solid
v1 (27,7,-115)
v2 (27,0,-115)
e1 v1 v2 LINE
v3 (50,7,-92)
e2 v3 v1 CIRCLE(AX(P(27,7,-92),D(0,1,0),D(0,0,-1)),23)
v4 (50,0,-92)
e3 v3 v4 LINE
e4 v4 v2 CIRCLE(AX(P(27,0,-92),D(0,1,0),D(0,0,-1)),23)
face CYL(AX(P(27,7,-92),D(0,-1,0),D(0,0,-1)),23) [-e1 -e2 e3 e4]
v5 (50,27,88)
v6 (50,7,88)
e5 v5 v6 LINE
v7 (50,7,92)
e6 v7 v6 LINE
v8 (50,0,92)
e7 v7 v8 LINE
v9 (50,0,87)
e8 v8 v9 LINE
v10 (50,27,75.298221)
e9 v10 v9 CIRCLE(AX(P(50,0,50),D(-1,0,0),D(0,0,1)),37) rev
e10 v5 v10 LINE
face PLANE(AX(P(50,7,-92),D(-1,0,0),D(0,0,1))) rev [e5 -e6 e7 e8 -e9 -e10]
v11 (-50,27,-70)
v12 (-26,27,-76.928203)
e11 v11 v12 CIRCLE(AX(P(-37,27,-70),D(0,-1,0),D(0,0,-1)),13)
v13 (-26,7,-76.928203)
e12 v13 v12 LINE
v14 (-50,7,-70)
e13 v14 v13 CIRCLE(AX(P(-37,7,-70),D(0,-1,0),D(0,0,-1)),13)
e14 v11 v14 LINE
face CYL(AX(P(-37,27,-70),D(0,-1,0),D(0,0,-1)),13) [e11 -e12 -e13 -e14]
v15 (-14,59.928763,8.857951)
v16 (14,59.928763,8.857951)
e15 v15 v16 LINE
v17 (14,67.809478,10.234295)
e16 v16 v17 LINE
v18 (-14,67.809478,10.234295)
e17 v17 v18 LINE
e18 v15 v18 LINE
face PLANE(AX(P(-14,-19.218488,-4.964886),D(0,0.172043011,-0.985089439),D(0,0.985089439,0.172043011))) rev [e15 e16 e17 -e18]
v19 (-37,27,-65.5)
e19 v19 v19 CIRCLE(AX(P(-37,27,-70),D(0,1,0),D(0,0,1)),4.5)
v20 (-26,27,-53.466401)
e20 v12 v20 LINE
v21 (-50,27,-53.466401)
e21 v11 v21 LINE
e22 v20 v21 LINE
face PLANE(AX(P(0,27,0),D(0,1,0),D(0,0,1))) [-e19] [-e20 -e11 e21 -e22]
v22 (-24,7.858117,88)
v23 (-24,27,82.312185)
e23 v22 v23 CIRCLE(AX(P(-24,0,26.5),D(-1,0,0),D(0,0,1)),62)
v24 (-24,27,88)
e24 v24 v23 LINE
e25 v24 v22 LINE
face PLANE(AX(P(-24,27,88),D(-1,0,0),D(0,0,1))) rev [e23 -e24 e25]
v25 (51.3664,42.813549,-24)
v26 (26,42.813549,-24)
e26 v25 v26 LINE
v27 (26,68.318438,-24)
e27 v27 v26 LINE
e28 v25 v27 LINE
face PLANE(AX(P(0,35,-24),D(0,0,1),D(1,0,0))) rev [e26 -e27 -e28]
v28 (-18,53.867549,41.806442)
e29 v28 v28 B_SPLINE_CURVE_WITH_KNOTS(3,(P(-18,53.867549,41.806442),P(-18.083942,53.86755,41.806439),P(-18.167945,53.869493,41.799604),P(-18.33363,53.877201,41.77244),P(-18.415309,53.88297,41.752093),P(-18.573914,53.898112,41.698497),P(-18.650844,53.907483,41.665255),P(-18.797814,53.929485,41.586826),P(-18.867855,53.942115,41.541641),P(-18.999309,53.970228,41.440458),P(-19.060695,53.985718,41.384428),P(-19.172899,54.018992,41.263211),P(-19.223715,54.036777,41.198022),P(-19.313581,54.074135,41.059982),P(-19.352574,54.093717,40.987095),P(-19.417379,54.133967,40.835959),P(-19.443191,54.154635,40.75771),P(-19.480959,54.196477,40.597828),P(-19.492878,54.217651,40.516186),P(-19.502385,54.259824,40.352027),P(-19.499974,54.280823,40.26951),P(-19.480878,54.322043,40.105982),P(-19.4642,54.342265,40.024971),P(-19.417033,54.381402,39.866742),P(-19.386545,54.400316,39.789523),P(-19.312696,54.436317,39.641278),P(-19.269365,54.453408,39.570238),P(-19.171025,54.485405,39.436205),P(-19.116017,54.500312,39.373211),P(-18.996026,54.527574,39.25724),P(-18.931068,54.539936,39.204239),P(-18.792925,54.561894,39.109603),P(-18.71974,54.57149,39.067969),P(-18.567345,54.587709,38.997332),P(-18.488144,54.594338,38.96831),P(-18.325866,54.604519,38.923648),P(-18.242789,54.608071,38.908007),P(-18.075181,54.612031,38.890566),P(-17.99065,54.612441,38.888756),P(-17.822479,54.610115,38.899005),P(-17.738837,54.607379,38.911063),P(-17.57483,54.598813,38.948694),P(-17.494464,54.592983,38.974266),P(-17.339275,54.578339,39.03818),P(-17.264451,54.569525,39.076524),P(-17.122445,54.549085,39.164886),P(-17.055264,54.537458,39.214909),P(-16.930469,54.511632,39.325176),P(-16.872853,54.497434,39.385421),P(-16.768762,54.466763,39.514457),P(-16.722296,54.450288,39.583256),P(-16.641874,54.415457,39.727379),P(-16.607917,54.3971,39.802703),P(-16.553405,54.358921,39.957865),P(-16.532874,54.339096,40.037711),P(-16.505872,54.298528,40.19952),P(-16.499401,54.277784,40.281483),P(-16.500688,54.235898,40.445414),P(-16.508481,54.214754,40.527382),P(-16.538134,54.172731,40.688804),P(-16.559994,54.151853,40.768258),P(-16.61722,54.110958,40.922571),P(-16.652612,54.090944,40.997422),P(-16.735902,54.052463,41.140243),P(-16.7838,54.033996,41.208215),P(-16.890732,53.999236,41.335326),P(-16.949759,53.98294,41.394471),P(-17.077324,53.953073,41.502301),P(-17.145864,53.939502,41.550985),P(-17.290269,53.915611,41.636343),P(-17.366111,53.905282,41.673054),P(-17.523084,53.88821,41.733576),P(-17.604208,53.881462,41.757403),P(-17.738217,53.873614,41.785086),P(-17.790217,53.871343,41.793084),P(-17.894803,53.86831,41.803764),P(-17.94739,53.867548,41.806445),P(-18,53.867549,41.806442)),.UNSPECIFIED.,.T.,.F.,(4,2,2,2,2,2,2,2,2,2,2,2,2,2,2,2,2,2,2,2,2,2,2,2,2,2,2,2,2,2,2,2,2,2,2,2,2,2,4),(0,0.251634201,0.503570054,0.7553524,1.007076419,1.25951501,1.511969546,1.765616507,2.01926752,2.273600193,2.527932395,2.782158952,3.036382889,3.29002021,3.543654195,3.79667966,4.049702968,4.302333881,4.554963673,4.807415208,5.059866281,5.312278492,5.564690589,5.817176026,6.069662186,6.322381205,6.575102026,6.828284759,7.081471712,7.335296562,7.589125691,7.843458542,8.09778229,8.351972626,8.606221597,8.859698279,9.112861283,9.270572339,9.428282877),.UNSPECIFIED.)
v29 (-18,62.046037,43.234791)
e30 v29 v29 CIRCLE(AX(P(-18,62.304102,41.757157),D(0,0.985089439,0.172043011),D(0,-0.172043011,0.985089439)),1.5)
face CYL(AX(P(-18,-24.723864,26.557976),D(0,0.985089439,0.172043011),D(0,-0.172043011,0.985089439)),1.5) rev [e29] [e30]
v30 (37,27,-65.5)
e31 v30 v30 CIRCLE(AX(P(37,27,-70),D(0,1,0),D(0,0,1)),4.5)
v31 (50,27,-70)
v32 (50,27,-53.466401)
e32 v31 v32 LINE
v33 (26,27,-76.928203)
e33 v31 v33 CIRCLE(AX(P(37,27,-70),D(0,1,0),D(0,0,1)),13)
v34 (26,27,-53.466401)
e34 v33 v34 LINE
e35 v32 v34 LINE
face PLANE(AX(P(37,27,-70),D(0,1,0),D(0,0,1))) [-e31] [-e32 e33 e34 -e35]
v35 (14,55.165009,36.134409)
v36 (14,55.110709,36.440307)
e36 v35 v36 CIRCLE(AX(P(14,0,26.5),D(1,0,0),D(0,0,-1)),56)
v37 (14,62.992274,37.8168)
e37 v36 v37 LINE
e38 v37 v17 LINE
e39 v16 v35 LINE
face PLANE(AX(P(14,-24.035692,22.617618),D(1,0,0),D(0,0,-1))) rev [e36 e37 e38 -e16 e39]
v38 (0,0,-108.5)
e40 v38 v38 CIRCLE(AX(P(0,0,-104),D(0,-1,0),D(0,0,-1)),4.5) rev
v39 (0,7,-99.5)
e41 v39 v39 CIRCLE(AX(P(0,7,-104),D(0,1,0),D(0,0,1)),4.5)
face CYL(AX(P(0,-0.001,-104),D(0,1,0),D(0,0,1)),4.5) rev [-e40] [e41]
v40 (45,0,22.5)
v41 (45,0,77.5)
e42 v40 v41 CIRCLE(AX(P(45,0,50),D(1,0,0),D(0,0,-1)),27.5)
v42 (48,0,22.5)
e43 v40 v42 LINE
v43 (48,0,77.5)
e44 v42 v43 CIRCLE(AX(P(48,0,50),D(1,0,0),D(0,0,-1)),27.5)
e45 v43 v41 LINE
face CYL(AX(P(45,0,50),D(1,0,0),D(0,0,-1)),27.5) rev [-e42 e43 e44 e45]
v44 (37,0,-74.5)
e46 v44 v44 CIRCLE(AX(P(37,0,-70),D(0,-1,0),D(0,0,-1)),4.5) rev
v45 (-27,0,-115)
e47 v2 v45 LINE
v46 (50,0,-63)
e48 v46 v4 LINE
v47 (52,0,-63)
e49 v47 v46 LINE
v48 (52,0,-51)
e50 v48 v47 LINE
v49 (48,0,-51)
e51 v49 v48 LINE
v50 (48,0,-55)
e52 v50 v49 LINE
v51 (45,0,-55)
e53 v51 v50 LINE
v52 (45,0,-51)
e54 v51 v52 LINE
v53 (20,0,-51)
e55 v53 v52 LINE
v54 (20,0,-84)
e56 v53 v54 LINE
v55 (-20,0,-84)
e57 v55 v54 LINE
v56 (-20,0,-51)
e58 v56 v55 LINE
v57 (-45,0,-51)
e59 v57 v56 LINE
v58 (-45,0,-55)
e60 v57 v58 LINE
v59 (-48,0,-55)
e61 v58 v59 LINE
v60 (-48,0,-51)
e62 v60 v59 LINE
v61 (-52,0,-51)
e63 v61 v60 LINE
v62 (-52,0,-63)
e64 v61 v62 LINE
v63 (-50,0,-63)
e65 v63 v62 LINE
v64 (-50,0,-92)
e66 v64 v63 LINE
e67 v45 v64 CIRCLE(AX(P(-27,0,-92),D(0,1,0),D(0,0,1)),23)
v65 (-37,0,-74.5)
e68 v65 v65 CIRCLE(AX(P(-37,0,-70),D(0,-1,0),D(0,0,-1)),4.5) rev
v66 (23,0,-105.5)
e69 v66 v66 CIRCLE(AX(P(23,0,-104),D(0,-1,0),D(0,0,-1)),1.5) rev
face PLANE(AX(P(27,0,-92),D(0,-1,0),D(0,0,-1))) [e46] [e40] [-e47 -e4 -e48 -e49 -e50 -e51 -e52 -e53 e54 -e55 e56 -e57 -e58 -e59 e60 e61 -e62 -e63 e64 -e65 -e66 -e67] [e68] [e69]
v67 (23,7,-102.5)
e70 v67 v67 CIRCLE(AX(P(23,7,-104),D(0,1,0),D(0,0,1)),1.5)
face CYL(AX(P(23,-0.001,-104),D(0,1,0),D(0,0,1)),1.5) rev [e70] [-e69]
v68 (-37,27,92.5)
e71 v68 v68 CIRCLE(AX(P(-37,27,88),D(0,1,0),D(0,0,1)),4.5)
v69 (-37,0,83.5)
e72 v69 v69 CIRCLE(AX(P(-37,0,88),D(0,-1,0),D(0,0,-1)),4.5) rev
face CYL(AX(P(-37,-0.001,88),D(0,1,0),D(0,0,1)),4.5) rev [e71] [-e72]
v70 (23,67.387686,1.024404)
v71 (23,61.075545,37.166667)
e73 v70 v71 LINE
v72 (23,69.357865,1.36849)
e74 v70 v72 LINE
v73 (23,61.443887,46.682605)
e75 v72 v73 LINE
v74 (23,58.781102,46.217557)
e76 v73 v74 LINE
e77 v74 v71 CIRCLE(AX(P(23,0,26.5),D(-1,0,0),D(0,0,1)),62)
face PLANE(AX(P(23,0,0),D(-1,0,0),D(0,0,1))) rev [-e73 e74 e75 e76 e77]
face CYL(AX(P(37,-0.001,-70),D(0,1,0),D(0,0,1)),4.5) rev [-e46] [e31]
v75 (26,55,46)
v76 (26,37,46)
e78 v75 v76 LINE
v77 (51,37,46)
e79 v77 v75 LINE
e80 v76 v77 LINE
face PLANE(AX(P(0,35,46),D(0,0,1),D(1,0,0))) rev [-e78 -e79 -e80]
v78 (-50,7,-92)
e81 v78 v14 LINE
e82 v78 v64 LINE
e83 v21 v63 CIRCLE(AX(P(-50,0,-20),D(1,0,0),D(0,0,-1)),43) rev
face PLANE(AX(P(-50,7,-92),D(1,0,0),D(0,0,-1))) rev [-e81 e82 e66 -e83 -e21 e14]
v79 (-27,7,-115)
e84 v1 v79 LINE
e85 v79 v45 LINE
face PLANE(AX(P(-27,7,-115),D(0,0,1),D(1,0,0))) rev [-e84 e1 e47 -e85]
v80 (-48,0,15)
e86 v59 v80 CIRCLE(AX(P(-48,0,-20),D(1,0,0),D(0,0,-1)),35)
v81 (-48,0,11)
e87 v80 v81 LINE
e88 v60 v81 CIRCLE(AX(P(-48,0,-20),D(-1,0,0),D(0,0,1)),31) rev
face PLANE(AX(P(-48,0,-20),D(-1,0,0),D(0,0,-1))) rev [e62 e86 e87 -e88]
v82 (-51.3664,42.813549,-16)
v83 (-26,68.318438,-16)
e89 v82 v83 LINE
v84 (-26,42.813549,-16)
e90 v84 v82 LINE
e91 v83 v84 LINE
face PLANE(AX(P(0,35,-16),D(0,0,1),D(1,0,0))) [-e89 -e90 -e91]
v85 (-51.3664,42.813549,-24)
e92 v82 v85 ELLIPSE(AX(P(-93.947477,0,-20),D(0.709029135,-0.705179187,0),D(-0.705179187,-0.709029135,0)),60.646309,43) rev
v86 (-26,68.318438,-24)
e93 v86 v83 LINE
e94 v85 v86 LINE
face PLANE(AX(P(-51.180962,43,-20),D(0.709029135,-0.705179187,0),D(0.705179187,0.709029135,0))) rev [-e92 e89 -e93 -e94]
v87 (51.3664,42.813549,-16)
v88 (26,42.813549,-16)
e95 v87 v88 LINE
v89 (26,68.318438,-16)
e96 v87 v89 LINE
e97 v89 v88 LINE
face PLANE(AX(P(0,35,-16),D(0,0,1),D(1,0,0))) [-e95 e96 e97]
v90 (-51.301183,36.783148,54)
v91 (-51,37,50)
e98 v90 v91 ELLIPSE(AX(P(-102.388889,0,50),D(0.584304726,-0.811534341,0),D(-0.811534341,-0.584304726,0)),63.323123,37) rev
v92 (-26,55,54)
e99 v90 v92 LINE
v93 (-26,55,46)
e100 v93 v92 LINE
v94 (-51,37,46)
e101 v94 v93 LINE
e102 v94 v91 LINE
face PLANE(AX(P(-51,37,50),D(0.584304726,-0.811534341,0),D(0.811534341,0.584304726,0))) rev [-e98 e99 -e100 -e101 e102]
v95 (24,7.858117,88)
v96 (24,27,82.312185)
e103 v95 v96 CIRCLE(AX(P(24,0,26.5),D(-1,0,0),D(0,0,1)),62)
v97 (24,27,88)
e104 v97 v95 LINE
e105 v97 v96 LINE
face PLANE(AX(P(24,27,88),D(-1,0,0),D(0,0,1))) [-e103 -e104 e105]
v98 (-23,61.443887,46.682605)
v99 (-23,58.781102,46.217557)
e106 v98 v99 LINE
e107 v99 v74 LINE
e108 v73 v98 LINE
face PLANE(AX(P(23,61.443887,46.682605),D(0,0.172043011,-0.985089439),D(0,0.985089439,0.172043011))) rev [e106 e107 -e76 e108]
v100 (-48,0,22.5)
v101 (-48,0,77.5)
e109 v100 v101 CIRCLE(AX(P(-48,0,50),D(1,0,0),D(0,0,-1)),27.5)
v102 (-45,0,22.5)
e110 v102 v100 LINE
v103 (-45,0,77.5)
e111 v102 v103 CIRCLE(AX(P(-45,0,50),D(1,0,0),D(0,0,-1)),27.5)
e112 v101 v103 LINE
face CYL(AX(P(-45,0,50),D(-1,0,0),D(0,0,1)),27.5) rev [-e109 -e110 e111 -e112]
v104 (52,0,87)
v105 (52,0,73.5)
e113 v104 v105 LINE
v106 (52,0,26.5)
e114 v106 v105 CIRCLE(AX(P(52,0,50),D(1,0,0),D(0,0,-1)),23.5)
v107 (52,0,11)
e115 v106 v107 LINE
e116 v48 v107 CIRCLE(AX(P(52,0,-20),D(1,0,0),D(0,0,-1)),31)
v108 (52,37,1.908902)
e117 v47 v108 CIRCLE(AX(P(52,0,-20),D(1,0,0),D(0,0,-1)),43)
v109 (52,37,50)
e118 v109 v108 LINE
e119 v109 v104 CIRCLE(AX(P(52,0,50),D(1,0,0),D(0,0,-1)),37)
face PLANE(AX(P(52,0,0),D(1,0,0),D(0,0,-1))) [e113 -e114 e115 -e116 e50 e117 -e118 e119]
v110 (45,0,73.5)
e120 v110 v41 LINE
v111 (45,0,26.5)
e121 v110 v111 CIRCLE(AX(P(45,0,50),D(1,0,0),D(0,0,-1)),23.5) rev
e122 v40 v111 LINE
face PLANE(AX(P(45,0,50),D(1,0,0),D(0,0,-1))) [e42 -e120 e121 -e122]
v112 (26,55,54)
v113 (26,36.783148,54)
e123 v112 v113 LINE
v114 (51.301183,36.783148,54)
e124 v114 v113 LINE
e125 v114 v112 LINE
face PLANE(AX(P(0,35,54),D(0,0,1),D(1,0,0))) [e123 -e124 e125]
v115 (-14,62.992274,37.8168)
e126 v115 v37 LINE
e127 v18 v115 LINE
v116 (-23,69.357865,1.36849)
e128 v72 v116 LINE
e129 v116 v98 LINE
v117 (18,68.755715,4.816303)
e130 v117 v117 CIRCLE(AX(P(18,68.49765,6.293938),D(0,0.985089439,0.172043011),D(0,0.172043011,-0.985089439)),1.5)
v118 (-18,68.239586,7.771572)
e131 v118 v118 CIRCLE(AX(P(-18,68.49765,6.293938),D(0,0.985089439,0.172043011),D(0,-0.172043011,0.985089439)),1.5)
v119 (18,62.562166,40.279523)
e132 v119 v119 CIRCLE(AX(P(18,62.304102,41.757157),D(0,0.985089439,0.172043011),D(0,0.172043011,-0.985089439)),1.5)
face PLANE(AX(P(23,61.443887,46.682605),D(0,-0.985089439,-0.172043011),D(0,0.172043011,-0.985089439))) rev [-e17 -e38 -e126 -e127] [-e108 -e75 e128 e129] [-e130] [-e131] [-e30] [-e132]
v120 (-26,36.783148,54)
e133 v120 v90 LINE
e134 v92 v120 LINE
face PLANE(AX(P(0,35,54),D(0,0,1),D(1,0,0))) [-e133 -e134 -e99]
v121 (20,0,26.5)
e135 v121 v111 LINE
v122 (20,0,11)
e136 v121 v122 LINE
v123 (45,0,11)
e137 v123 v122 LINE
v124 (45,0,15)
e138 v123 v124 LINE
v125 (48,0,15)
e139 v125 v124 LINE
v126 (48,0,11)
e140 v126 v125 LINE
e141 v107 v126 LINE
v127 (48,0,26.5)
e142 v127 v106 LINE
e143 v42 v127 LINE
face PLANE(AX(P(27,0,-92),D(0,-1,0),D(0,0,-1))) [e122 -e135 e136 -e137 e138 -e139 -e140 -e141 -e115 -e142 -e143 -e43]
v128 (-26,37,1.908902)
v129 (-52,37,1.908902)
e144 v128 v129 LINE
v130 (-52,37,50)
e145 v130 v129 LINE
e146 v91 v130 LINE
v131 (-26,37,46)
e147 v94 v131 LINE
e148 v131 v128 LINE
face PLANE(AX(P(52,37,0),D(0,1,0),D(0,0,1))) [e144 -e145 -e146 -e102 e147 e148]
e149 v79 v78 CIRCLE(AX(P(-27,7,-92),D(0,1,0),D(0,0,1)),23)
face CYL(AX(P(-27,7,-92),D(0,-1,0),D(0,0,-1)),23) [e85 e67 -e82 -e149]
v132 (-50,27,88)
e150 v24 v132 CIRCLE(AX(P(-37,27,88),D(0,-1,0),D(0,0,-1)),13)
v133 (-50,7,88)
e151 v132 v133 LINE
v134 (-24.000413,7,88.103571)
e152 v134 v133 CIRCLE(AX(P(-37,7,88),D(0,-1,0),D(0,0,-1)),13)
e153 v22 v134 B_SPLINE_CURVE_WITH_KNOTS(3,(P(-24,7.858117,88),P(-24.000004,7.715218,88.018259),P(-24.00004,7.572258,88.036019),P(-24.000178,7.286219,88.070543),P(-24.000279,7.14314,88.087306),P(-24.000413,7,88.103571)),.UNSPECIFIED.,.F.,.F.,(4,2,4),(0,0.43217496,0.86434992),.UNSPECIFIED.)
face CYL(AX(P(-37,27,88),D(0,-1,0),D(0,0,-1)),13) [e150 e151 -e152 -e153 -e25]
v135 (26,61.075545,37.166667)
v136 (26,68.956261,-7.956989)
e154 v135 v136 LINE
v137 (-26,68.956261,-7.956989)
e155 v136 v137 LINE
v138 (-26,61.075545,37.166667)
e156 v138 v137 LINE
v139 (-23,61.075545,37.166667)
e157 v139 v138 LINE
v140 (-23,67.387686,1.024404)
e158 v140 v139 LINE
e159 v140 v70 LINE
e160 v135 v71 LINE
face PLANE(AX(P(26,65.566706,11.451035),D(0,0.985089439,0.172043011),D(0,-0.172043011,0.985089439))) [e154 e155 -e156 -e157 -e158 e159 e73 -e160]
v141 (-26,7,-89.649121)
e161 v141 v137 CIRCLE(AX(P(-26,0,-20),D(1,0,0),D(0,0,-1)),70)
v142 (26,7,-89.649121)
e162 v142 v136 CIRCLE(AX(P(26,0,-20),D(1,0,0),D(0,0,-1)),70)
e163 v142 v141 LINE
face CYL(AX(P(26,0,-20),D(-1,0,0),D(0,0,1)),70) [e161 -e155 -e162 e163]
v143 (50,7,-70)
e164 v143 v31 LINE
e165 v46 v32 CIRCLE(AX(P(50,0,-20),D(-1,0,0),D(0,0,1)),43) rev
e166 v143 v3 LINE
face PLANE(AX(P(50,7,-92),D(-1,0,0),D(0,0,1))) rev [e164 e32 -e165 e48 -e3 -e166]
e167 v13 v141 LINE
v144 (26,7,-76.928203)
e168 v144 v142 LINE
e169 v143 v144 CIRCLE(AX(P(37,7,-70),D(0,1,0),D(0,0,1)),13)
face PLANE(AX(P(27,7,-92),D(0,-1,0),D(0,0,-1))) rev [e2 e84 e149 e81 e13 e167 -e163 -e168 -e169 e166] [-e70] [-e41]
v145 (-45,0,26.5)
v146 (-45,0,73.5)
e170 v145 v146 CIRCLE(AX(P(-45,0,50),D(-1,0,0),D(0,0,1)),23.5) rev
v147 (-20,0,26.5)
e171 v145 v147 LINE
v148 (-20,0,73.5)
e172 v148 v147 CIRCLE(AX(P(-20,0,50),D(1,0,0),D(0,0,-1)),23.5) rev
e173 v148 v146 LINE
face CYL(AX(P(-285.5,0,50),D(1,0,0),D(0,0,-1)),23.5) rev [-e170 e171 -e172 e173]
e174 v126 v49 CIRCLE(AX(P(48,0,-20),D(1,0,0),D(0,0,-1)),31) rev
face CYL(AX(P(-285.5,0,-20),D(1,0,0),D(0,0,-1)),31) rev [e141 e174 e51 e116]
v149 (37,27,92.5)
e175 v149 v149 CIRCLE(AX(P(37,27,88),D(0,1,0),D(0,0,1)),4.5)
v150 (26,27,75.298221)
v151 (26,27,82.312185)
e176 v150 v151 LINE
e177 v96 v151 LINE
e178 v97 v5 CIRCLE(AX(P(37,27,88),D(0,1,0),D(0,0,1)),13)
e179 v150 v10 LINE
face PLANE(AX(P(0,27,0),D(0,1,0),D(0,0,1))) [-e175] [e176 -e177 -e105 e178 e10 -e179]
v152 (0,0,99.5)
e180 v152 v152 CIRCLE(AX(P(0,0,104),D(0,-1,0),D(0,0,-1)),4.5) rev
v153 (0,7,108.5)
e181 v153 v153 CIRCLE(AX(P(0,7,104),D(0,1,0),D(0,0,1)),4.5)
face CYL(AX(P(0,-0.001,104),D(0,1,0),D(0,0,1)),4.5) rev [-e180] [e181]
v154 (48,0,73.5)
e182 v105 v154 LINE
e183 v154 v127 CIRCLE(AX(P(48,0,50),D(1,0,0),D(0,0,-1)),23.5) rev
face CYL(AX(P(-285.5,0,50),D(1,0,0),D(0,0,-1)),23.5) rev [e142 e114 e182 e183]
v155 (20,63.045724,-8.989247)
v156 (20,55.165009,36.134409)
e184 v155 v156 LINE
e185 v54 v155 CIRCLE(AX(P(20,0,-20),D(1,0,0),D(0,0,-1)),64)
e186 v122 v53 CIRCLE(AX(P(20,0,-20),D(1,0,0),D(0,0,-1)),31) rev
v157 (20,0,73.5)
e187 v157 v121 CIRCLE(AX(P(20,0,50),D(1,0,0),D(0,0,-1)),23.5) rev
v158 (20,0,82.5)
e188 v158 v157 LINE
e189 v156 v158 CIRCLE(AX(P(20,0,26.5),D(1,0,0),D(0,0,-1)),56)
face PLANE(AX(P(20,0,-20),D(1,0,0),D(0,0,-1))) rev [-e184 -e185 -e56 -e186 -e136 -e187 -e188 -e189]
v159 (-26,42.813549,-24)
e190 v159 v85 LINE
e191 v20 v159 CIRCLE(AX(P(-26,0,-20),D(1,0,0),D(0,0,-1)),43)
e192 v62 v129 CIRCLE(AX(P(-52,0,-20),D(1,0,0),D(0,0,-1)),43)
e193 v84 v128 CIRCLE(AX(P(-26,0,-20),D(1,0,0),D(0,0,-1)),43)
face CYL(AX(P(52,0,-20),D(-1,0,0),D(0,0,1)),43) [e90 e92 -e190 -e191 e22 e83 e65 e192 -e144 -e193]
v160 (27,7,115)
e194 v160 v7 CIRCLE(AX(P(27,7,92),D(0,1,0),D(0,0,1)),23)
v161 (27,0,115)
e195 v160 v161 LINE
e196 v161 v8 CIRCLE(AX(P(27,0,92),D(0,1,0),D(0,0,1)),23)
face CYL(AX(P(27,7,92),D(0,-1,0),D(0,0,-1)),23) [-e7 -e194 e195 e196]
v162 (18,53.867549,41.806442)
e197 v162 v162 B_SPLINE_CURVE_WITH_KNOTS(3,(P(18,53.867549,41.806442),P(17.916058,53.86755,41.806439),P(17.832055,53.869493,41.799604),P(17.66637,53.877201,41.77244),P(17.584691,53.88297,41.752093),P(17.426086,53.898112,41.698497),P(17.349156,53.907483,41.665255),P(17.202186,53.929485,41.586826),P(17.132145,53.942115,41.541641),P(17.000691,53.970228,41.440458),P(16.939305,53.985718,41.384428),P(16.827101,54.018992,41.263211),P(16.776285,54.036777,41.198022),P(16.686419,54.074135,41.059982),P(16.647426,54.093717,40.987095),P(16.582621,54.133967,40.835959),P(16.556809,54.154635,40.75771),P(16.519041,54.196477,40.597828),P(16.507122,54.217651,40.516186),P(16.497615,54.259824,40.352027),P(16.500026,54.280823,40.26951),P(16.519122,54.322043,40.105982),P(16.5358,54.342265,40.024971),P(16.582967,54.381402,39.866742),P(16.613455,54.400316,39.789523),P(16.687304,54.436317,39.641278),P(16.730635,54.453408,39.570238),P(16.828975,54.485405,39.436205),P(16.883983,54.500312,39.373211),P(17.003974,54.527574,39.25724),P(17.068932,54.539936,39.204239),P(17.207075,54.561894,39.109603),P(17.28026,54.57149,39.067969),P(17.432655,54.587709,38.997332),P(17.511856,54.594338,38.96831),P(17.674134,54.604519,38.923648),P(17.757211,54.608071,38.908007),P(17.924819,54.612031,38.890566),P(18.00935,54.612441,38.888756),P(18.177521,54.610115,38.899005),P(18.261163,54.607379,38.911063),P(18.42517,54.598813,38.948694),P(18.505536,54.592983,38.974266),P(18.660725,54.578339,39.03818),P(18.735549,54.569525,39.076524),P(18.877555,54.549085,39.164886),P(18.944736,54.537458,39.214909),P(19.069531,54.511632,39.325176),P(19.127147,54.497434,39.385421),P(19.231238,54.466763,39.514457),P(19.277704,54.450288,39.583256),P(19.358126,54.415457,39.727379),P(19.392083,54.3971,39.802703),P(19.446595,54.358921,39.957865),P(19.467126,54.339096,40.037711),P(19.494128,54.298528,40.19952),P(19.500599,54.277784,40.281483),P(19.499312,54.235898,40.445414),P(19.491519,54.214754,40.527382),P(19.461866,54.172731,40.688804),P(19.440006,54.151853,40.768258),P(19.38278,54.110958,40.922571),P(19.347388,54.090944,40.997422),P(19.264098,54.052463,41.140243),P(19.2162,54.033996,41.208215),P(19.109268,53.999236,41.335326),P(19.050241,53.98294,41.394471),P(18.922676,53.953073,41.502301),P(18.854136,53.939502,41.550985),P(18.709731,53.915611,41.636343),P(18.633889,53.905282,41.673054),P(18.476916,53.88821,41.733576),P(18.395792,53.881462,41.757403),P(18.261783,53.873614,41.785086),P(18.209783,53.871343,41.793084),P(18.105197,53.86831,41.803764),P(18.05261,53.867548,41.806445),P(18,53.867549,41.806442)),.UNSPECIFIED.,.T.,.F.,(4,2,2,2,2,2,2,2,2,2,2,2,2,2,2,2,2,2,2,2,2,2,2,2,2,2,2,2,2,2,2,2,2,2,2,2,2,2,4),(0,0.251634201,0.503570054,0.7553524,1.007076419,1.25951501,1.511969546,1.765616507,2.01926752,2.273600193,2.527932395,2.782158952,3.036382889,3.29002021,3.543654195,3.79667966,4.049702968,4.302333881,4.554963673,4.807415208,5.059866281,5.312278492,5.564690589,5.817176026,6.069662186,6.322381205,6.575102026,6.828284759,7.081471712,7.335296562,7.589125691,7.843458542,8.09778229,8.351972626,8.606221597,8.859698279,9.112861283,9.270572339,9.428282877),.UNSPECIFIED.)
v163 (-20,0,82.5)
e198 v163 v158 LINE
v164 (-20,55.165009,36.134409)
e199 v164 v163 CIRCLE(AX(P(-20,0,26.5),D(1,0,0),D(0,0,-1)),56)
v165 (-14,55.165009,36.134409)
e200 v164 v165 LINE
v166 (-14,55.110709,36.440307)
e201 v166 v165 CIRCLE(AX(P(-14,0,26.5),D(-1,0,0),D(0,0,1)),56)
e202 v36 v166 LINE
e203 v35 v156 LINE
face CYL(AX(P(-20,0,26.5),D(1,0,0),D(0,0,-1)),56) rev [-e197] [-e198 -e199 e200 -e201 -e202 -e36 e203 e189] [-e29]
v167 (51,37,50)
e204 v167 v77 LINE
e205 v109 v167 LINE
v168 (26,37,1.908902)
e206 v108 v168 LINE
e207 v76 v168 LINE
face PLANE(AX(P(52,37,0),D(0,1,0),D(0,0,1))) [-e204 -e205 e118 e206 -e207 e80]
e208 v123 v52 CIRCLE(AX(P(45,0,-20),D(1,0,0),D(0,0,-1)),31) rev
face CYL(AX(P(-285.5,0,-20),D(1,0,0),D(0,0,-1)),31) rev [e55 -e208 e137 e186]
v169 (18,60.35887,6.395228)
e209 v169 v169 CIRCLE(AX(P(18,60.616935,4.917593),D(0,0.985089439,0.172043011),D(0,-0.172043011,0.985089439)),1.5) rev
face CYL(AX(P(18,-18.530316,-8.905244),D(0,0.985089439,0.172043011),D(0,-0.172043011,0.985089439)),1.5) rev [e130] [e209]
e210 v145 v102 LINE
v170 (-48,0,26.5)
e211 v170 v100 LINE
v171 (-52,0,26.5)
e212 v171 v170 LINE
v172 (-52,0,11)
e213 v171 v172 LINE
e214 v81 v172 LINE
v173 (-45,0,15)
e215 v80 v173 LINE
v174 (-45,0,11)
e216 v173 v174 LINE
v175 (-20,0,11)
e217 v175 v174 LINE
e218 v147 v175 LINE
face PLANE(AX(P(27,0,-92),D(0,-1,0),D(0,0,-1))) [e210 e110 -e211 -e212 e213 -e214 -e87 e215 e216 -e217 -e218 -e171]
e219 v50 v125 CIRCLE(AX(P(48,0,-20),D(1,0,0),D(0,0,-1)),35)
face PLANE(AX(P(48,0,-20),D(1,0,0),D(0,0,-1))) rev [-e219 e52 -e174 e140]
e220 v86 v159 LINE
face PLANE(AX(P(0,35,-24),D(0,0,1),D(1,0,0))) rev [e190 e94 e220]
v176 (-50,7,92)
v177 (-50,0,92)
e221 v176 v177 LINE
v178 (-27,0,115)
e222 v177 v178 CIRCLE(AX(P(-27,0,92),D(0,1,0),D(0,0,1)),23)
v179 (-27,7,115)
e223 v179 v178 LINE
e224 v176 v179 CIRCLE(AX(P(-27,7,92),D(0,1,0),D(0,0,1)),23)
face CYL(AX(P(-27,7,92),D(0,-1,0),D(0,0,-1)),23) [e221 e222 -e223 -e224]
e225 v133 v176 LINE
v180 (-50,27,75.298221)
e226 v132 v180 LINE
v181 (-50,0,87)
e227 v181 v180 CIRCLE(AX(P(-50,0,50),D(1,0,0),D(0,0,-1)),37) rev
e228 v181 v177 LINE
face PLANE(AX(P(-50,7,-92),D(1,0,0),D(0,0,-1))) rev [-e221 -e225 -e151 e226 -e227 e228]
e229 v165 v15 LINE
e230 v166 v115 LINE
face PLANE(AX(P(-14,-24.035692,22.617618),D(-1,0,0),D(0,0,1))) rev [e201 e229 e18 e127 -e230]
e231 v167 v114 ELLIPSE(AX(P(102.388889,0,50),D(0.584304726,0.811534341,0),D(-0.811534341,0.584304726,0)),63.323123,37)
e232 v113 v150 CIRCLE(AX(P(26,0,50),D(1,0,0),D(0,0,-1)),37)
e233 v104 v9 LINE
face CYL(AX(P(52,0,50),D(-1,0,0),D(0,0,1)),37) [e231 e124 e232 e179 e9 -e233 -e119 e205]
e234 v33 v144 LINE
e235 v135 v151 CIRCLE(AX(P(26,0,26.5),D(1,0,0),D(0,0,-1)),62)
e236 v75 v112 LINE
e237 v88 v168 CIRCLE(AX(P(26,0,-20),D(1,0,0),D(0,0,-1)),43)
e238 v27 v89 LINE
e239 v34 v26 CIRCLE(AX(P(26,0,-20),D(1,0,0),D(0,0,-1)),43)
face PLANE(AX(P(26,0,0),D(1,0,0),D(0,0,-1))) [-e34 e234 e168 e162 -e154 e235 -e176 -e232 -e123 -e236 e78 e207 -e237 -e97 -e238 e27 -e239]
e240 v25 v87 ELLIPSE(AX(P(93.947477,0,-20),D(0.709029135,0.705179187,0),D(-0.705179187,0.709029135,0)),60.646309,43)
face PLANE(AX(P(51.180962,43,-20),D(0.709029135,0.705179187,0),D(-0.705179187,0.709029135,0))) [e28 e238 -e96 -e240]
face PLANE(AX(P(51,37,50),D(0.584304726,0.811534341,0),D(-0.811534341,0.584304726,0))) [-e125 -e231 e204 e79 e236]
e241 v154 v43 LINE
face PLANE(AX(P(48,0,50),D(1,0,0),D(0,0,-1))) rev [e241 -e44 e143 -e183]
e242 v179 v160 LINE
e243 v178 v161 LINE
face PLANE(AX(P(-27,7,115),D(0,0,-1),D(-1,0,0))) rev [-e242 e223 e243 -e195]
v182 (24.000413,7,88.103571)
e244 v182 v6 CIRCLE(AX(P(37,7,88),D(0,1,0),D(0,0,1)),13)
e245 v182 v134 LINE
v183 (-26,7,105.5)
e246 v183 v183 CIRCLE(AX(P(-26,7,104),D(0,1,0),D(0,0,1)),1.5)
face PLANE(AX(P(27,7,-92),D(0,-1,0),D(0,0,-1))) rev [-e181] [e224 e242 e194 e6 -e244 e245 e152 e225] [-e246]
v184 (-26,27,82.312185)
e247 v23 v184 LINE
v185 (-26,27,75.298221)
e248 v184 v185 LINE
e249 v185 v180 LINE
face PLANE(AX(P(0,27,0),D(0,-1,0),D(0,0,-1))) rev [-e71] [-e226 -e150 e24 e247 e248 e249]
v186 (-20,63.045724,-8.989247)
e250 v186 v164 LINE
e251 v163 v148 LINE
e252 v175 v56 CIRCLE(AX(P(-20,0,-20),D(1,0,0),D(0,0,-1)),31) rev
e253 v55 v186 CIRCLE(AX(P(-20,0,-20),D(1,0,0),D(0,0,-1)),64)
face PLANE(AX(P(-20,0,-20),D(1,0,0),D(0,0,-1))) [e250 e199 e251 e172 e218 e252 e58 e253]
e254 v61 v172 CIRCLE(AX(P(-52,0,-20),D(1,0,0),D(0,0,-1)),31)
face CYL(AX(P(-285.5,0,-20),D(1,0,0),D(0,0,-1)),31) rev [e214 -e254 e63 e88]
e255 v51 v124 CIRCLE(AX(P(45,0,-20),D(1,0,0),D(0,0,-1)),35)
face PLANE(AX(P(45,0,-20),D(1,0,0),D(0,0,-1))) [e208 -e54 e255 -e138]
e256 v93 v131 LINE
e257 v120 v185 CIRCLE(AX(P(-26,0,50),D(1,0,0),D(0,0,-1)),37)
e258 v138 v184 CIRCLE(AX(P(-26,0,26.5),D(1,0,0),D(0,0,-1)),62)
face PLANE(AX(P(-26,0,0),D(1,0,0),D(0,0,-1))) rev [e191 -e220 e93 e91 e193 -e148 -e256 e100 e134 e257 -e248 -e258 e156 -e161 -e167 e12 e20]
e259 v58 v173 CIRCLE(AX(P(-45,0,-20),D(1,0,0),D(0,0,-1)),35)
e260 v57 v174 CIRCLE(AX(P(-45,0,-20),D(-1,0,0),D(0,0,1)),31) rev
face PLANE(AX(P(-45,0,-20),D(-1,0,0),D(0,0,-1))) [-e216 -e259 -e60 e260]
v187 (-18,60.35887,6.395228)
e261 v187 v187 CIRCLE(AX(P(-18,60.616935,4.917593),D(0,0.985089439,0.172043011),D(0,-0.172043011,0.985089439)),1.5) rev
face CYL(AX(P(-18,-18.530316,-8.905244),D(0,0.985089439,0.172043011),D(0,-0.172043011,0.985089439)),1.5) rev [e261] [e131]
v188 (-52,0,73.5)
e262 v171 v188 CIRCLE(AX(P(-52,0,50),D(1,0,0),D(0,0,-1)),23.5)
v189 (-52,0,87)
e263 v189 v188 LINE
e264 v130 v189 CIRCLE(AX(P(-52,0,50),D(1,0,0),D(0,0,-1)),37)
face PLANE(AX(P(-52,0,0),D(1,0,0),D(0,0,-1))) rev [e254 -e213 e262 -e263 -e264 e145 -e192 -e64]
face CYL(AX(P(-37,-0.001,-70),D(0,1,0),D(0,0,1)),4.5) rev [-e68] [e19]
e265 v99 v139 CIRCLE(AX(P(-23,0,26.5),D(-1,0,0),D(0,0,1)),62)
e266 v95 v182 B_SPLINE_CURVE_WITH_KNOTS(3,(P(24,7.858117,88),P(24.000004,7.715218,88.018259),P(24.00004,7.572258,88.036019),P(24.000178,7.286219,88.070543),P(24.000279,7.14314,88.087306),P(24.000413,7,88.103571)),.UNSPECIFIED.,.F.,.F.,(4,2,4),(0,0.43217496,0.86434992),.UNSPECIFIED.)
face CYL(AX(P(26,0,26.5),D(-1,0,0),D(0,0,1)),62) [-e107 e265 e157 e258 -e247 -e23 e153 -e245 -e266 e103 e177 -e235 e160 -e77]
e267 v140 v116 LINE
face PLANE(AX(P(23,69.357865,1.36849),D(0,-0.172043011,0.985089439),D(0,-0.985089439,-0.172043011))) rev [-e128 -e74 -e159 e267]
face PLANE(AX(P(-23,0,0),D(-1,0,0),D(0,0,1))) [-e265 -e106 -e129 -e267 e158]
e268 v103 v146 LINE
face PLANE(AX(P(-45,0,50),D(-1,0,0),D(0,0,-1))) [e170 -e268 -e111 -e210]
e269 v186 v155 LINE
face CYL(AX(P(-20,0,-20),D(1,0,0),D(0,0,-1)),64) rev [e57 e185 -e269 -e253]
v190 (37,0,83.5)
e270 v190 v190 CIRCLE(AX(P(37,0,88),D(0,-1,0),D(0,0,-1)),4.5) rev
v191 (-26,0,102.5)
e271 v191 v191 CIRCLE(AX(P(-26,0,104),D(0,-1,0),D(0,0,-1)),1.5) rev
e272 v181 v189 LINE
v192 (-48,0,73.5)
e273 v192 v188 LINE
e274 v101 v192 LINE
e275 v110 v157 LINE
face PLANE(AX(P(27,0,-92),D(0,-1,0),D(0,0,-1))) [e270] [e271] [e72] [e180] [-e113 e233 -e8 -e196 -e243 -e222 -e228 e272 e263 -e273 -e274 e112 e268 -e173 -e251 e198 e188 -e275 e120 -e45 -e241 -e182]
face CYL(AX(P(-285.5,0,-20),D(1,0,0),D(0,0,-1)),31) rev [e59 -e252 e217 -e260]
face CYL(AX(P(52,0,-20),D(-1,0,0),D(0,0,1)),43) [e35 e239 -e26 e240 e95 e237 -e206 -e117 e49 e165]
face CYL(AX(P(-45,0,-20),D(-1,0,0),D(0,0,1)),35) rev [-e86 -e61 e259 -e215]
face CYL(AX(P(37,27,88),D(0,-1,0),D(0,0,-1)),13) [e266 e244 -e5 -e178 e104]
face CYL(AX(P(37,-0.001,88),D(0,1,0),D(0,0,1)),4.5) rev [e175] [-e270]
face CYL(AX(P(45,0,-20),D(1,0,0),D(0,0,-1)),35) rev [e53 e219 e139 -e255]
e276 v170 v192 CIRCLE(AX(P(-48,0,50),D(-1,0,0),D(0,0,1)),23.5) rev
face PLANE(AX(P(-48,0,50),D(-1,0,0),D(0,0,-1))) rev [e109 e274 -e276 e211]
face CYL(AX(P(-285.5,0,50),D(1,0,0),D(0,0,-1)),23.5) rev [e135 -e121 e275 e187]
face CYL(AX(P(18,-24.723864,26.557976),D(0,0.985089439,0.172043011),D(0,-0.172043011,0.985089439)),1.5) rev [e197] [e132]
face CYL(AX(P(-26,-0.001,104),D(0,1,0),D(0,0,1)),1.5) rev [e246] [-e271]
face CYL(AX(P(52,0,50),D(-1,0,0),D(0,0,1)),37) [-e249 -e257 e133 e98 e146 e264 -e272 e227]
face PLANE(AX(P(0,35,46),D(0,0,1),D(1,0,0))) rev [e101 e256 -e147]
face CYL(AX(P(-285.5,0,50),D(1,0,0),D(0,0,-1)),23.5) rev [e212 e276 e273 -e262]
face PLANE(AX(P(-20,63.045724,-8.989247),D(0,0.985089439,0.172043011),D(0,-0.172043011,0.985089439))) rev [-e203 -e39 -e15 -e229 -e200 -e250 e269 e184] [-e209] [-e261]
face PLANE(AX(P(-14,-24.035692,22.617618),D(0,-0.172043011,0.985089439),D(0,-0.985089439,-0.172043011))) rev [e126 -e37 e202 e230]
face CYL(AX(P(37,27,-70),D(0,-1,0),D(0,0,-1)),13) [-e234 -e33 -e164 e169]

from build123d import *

# Parameters (mm, degrees)
EXTRUDE_1_DEPTH             = 7
EXTRUDE_2_DEPTH             = 52
EXTRUDE_4_DEPTH             = 26
SKETCH_4_R                  = 13
SKETCH_4_W                  = 26
SKETCH_4_H                  = 38
SKETCH_4_H_2                = 45
EXTRUDE_5_DEPTH             = 20
RIB_5_REACH                 = 188.625
SKETCH_5_WALL_W             = 406.05642967
SKETCH_5_WALL_H             = 8
RIB_6_REACH                 = 162.714
SKETCH_6_WALL_W             = 359.136664294
SKETCH_6_WALL_H             = 8
CUT_EXTRUDE_1_REACH         = 143.06
SKETCH_7_R                  = 4.5
CUT_EXTRUDE_2_REACH         = 135.334
SKETCH_8_R                  = 4.5
PATTERN_LINEAR_1_COUNT      = 2
PATTERN_LINEAR_1_PITCH      = 74
PATTERN_LINEAR_1_COUNT_DIR2 = 2
PATTERN_LINEAR_1_PITCH_DIR2 = 158
CUT_EXTRUDE_3_REACH         = 143.06
SKETCH_9_R                  = 1.5
CUT_EXTRUDE_4_REACH         = 143.06
SKETCH_10_R                 = 1.5
SKETCH_11_R                 = 23.5
SKETCH_11_R_2               = 31
CUT_EXTRUDE_5_DEPTH         = 285.5
CUT_EXTRUDE_START           = 48
SKETCH_13_R                 = 27.5
SKETCH_13_R_2               = 35
CUT_EXTRUDE_6_DEPTH         = 3
CUT_EXTRUDE_7_DEPTH         = 20
EXTRUDE_6_DEPTH             = 23
CUT_EXTRUDE_8_REACH         = 154.782
SKETCH_17_W                 = 28
SKETCH_17_H                 = 28
CUT_EXTRUDE_9_REACH         = 154.782
SKETCH_18_R                 = 1.5


with BuildPart() as part:
    # 草图1 → 凸台-拉伸1 (new body)
    with BuildSketch(Plane(origin=(0, 0, 0), x_dir=(1, 0, 0), z_dir=(0, 1, 0))):
        with BuildLine():
            Line((-27, 115), (27, 115))
            ThreePointArc((27, 115), (43.263455967, 108.263455967), (50, 92))
            Line((50, 92), (50, -92))
            ThreePointArc((50, -92), (43.263455967, -108.263455967), (27, -115))
            Line((27, -115), (-27, -115))
            ThreePointArc((-27, -115), (-43.263455967, -108.263455967), (-50, -92))
            Line((-50, -92), (-50, 92))
            ThreePointArc((-50, 92), (-43.263455967, 108.263455967), (-27, 115))
        make_face()
    extrude(amount=EXTRUDE_1_DEPTH)

    # 草图2 → 凸台-拉伸2 (add, symmetric)
    with BuildSketch(Plane(origin=(0, 0, 0), x_dir=(0, 0, -1), z_dir=(1, 0, 0))):
        with BuildLine():
            Line((-1.9089023, 37), (-50, 37))
            ThreePointArc((-50, 37), (-76.162950904, 26.162950904), (-87, 0))
            Line((-87, 0), (63, 0))
            ThreePointArc((63, 0), (41.294567395, 37.356945799), (-1.9089023, 37))
        make_face()
    extrude(amount=EXTRUDE_2_DEPTH, both=True)

    # 草图3 → 凸台-拉伸4 (add, symmetric)
    with BuildSketch(Plane(origin=(0, 0, 0), x_dir=(0, 0, -1), z_dir=(1, 0, 0))):
        with BuildLine():
            Line((7.956989247, 68.956260717), (-37.166666667, 61.075545206))
            ThreePointArc((-37.166666667, 61.075545206), (-71.630787409, 42.511316468), (-88.103571325, 7))
            Line((-88.103571325, 7), (89.649120597, 7))
            ThreePointArc((89.649120597, 7), (62.299651693, 55.774003502), (7.956989247, 68.956260717))
        make_face()
    extrude(amount=EXTRUDE_4_DEPTH, both=True)

    # 草图4 → 凸台-拉伸5 (add)
    with BuildSketch(Plane(origin=(0, 7, 0), x_dir=(1, 0, 0), z_dir=(0, 1, 0))):
        with Locations((37, -88)):
            Circle(SKETCH_4_R)
        with Locations((-37, -88)):
            Circle(SKETCH_4_R)
        with Locations((37, 70)):
            Circle(SKETCH_4_R)
        with Locations((-37, 70)):
            Circle(SKETCH_4_R)
        with Locations((37, -69)):
            Rectangle(SKETCH_4_W, SKETCH_4_H)
        with Locations((-37, -69)):
            Rectangle(SKETCH_4_W, SKETCH_4_H)
        with Locations((37, 47.5)):
            Rectangle(SKETCH_4_W, SKETCH_4_H_2)
        with Locations((-37, 47.5)):
            Rectangle(SKETCH_4_W, SKETCH_4_H_2)
    extrude(amount=EXTRUDE_5_DEPTH)

    # 草图5 wall → 筋5 (add, up to next)
    with BuildSketch(Plane(origin=(38.5, 46, 50), x_dir=(-0.811534341451, 0.584304725845, 0), z_dir=(-0.584304725845, -0.811534341451, 0)), mode=Mode.PRIVATE) as rib_5_sk1:
        Rectangle(SKETCH_5_WALL_W, SKETCH_5_WALL_H)
    rib_5_tool1 = extrude(rib_5_sk1.sketch, amount=RIB_5_REACH, mode=Mode.PRIVATE) - part.part
    rib_5 = rib_5_tool1.solids().sort_by_distance((38.5, 46, 50))[0]
    add(rib_5)

    # 镜向1: 筋5 across plane
    add(rib_5.mirror(Plane(origin=(0, 0, 0), x_dir=(0, 0, 1), z_dir=(1, 0, 0))))

    # 草图6 wall → 筋6 (add, up to next)
    with BuildSketch(Plane(origin=(38.590481041, 55.659219169, -20), x_dir=(-0.705179186997, 0.709029134963, 0), z_dir=(-0.709029134963, -0.705179186997, 0)), mode=Mode.PRIVATE) as rib_6_sk1:
        Rectangle(SKETCH_6_WALL_W, SKETCH_6_WALL_H)
    rib_6_tool1 = extrude(rib_6_sk1.sketch, amount=RIB_6_REACH, mode=Mode.PRIVATE) - part.part
    rib_6 = rib_6_tool1.solids().sort_by_distance((38.590481041, 55.659219169, -20))[0]
    add(rib_6)

    # 镜向2: 筋6 across plane
    add(rib_6.mirror(Plane(origin=(0, 0, 0), x_dir=(0, 0, 1), z_dir=(1, 0, 0))))

    # 草图7 → 切除-拉伸1 (cut, up to next)
    with BuildSketch(Plane(origin=(0, 7, 0), x_dir=(1, 0, 0), z_dir=(0, 1, 0)), mode=Mode.PRIVATE) as cut_extrude_1_sk1:
        with Locations((0, 104)):
            Circle(SKETCH_7_R)
    cut_extrude_1_tool1 = extrude(cut_extrude_1_sk1.sketch, amount=-CUT_EXTRUDE_1_REACH, mode=Mode.PRIVATE) & part.part
    # 草图7 → 切除-拉伸1 (cut, up to next)
    with BuildSketch(Plane(origin=(0, 7, 0), x_dir=(1, 0, 0), z_dir=(0, 1, 0)), mode=Mode.PRIVATE) as cut_extrude_1_sk2:
        with Locations((0, -104)):
            Circle(SKETCH_7_R)
    cut_extrude_1_tool2 = extrude(cut_extrude_1_sk2.sketch, amount=-CUT_EXTRUDE_1_REACH, mode=Mode.PRIVATE) & part.part
    add(cut_extrude_1_tool1.solids().sort_by_distance((0, 7, -104))[0], mode=Mode.SUBTRACT)
    add(cut_extrude_1_tool2.solids().sort_by_distance((0, 7, 104))[0], mode=Mode.SUBTRACT)

    # 草图8 → 切除-拉伸2 (cut, up to next)
    with BuildSketch(Plane(origin=(0, 27, 0), x_dir=(1, 0, 0), z_dir=(0, 1, 0)), mode=Mode.PRIVATE) as cut_extrude_2_sk1:
        with Locations((-37, 70)):
            Circle(SKETCH_8_R)
    cut_extrude_2_tool1 = extrude(cut_extrude_2_sk1.sketch, amount=-CUT_EXTRUDE_2_REACH, mode=Mode.PRIVATE) & part.part
    cut_extrude_2 = cut_extrude_2_tool1.solids().sort_by_distance((-37, 27, -70))[0]
    add(cut_extrude_2, mode=Mode.SUBTRACT)

    # 阵列(线性)1: Cut-Extrude 2 2 × 2
    with Locations(*[(i * PATTERN_LINEAR_1_PITCH, 0, j * PATTERN_LINEAR_1_PITCH_DIR2) for i in range(PATTERN_LINEAR_1_COUNT) for j in range(PATTERN_LINEAR_1_COUNT_DIR2) if (i, j) != (0, 0)]):
        add(cut_extrude_2, mode=Mode.SUBTRACT)

    # 草图9 → 切除-拉伸3 (cut, up to next)
    with BuildSketch(Plane(origin=(0, 7, 0), x_dir=(1, 0, 0), z_dir=(0, 1, 0)), mode=Mode.PRIVATE) as cut_extrude_3_sk1:
        with Locations((-26, -104)):
            Circle(SKETCH_9_R)
    cut_extrude_3_tool1 = extrude(cut_extrude_3_sk1.sketch, amount=-CUT_EXTRUDE_3_REACH, mode=Mode.PRIVATE) & part.part
    add(cut_extrude_3_tool1.solids().sort_by_distance((-26, 7, 104))[0], mode=Mode.SUBTRACT)

    # 草图10 → 切除-拉伸4 (cut, up to next)
    with BuildSketch(Plane(origin=(0, 7, 0), x_dir=(1, 0, 0), z_dir=(0, 1, 0)), mode=Mode.PRIVATE) as cut_extrude_4_sk1:
        with Locations((23, 104)):
            Circle(SKETCH_10_R)
    cut_extrude_4_tool1 = extrude(cut_extrude_4_sk1.sketch, amount=-CUT_EXTRUDE_4_REACH, mode=Mode.PRIVATE) & part.part
    add(cut_extrude_4_tool1.solids().sort_by_distance((23, 7, -104))[0], mode=Mode.SUBTRACT)

    # 草图11 → 切除-拉伸5 (cut, symmetric)
    with BuildSketch(Plane(origin=(0, 0, 0), x_dir=(0, 0, -1), z_dir=(1, 0, 0))):
        with Locations((-50, 0)):
            Circle(SKETCH_11_R)
        with Locations((20, 0)):
            Circle(SKETCH_11_R_2)
    extrude(amount=CUT_EXTRUDE_5_DEPTH, both=True, mode=Mode.SUBTRACT)

    # 草图13 → 切除-拉伸6 (cut)
    with BuildSketch(Plane(origin=(0, 0, 0), x_dir=(0, 0, -1), z_dir=(1, 0, 0)).offset(CUT_EXTRUDE_START)):
        with Locations((-50, 0)):
            Circle(SKETCH_13_R)
        with Locations((20, 0)):
            Circle(SKETCH_13_R_2)
    cut_extrude_6 = extrude(amount=-CUT_EXTRUDE_6_DEPTH, mode=Mode.SUBTRACT)

    # 镜向3: 切除-拉伸6 across plane
    add(cut_extrude_6.mirror(Plane(origin=(0, 0, 0), x_dir=(0, 0, 1), z_dir=(1, 0, 0))), mode=Mode.SUBTRACT)

    # 草图15 → 切除-拉伸7 (cut, symmetric)
    with BuildSketch(Plane(origin=(0, 0, 0), x_dir=(0, 0, -1), z_dir=(1, 0, 0))):
        with BuildLine():
            Line((-82.5, 0), (84, 0))
            ThreePointArc((84, 0), (61.178342778, 48.993306543), (8.989247312, 63.045724084))
            Line((8.989247312, 63.045724084), (-36.134408602, 55.165008573))
            ThreePointArc((-36.134408602, 55.165008573), (-69.369143225, 36.031049931), (-82.5, 0))
        make_face()
    extrude(amount=CUT_EXTRUDE_7_DEPTH, both=True, mode=Mode.SUBTRACT)

    # 草图16 → 凸台-拉伸6 (add, symmetric)
    with BuildSketch(Plane(origin=(0, 0, 0), x_dir=(0, 0, -1), z_dir=(1, 0, 0))):
        Polygon((-46.682604529, 61.443886786), (-45.822389476, 56.518439592), (-0.508275291, 64.432418086), (-1.368490344, 69.35786528), align=None)
    extrude(amount=EXTRUDE_6_DEPTH, both=True)

    # 草图17 → 切除-拉伸8 (cut, up to next)
    with BuildSketch(Plane(origin=(0, 67.536884536, 11.795120823), x_dir=(1, 0, 0), z_dir=(0, 0.9850894388080457, 0.17204301075268907)), mode=Mode.PRIVATE) as cut_extrude_8_sk1:
        with Locations((0, -12.415549423)):
            Rectangle(SKETCH_17_W, SKETCH_17_H)
    cut_extrude_8_tool1 = extrude(cut_extrude_8_sk1.sketch, amount=-CUT_EXTRUDE_8_REACH, mode=Mode.PRIVATE) & part.part
    add(cut_extrude_8_tool1.solids().sort_by_distance((0, 65.400876, 24.025547))[0], mode=Mode.SUBTRACT)

    # 草图18 → 切除-拉伸9 (cut, up to next)
    with BuildSketch(Plane(origin=(0, 67.536884536, 11.795120823), x_dir=(1, 0, 0), z_dir=(0, 0.9850894388080457, 0.17204301075268907)), mode=Mode.PRIVATE) as cut_extrude_9_sk1:
        with Locations((-18, -30.415549423)):
            Circle(SKETCH_18_R)
    cut_extrude_9_tool1 = extrude(cut_extrude_9_sk1.sketch, amount=-CUT_EXTRUDE_9_REACH, mode=Mode.PRIVATE) & part.part
    # 草图18 → 切除-拉伸9 (cut, up to next)
    with BuildSketch(Plane(origin=(0, 67.536884536, 11.795120823), x_dir=(1, 0, 0), z_dir=(0, 0.9850894388080457, 0.17204301075268907)), mode=Mode.PRIVATE) as cut_extrude_9_sk2:
        with Locations((18, -30.415549423)):
            Circle(SKETCH_18_R)
    cut_extrude_9_tool2 = extrude(cut_extrude_9_sk2.sketch, amount=-CUT_EXTRUDE_9_REACH, mode=Mode.PRIVATE) & part.part
    # 草图18 → 切除-拉伸9 (cut, up to next)
    with BuildSketch(Plane(origin=(0, 67.536884536, 11.795120823), x_dir=(1, 0, 0), z_dir=(0, 0.9850894388080457, 0.17204301075268907)), mode=Mode.PRIVATE) as cut_extrude_9_sk3:
        with Locations((-18, 5.584450577)):
            Circle(SKETCH_18_R)
    cut_extrude_9_tool3 = extrude(cut_extrude_9_sk3.sketch, amount=-CUT_EXTRUDE_9_REACH, mode=Mode.PRIVATE) & part.part
    # 草图18 → 切除-拉伸9 (cut, up to next)
    with BuildSketch(Plane(origin=(0, 67.536884536, 11.795120823), x_dir=(1, 0, 0), z_dir=(0, 0.9850894388080457, 0.17204301075268907)), mode=Mode.PRIVATE) as cut_extrude_9_sk4:
        with Locations((18, 5.584450577)):
            Circle(SKETCH_18_R)
    cut_extrude_9_tool4 = extrude(cut_extrude_9_sk4.sketch, amount=-CUT_EXTRUDE_9_REACH, mode=Mode.PRIVATE) & part.part
    add(cut_extrude_9_tool1.solids().sort_by_distance((-18, 62.304102, 41.757157))[0], mode=Mode.SUBTRACT)
    add(cut_extrude_9_tool2.solids().sort_by_distance((18, 62.304102, 41.757157))[0], mode=Mode.SUBTRACT)
    add(cut_extrude_9_tool3.solids().sort_by_distance((-18, 68.49765, 6.293938))[0], mode=Mode.SUBTRACT)
    add(cut_extrude_9_tool4.solids().sort_by_distance((18, 68.49765, 6.293938))[0], mode=Mode.SUBTRACT)


solid = part.part
